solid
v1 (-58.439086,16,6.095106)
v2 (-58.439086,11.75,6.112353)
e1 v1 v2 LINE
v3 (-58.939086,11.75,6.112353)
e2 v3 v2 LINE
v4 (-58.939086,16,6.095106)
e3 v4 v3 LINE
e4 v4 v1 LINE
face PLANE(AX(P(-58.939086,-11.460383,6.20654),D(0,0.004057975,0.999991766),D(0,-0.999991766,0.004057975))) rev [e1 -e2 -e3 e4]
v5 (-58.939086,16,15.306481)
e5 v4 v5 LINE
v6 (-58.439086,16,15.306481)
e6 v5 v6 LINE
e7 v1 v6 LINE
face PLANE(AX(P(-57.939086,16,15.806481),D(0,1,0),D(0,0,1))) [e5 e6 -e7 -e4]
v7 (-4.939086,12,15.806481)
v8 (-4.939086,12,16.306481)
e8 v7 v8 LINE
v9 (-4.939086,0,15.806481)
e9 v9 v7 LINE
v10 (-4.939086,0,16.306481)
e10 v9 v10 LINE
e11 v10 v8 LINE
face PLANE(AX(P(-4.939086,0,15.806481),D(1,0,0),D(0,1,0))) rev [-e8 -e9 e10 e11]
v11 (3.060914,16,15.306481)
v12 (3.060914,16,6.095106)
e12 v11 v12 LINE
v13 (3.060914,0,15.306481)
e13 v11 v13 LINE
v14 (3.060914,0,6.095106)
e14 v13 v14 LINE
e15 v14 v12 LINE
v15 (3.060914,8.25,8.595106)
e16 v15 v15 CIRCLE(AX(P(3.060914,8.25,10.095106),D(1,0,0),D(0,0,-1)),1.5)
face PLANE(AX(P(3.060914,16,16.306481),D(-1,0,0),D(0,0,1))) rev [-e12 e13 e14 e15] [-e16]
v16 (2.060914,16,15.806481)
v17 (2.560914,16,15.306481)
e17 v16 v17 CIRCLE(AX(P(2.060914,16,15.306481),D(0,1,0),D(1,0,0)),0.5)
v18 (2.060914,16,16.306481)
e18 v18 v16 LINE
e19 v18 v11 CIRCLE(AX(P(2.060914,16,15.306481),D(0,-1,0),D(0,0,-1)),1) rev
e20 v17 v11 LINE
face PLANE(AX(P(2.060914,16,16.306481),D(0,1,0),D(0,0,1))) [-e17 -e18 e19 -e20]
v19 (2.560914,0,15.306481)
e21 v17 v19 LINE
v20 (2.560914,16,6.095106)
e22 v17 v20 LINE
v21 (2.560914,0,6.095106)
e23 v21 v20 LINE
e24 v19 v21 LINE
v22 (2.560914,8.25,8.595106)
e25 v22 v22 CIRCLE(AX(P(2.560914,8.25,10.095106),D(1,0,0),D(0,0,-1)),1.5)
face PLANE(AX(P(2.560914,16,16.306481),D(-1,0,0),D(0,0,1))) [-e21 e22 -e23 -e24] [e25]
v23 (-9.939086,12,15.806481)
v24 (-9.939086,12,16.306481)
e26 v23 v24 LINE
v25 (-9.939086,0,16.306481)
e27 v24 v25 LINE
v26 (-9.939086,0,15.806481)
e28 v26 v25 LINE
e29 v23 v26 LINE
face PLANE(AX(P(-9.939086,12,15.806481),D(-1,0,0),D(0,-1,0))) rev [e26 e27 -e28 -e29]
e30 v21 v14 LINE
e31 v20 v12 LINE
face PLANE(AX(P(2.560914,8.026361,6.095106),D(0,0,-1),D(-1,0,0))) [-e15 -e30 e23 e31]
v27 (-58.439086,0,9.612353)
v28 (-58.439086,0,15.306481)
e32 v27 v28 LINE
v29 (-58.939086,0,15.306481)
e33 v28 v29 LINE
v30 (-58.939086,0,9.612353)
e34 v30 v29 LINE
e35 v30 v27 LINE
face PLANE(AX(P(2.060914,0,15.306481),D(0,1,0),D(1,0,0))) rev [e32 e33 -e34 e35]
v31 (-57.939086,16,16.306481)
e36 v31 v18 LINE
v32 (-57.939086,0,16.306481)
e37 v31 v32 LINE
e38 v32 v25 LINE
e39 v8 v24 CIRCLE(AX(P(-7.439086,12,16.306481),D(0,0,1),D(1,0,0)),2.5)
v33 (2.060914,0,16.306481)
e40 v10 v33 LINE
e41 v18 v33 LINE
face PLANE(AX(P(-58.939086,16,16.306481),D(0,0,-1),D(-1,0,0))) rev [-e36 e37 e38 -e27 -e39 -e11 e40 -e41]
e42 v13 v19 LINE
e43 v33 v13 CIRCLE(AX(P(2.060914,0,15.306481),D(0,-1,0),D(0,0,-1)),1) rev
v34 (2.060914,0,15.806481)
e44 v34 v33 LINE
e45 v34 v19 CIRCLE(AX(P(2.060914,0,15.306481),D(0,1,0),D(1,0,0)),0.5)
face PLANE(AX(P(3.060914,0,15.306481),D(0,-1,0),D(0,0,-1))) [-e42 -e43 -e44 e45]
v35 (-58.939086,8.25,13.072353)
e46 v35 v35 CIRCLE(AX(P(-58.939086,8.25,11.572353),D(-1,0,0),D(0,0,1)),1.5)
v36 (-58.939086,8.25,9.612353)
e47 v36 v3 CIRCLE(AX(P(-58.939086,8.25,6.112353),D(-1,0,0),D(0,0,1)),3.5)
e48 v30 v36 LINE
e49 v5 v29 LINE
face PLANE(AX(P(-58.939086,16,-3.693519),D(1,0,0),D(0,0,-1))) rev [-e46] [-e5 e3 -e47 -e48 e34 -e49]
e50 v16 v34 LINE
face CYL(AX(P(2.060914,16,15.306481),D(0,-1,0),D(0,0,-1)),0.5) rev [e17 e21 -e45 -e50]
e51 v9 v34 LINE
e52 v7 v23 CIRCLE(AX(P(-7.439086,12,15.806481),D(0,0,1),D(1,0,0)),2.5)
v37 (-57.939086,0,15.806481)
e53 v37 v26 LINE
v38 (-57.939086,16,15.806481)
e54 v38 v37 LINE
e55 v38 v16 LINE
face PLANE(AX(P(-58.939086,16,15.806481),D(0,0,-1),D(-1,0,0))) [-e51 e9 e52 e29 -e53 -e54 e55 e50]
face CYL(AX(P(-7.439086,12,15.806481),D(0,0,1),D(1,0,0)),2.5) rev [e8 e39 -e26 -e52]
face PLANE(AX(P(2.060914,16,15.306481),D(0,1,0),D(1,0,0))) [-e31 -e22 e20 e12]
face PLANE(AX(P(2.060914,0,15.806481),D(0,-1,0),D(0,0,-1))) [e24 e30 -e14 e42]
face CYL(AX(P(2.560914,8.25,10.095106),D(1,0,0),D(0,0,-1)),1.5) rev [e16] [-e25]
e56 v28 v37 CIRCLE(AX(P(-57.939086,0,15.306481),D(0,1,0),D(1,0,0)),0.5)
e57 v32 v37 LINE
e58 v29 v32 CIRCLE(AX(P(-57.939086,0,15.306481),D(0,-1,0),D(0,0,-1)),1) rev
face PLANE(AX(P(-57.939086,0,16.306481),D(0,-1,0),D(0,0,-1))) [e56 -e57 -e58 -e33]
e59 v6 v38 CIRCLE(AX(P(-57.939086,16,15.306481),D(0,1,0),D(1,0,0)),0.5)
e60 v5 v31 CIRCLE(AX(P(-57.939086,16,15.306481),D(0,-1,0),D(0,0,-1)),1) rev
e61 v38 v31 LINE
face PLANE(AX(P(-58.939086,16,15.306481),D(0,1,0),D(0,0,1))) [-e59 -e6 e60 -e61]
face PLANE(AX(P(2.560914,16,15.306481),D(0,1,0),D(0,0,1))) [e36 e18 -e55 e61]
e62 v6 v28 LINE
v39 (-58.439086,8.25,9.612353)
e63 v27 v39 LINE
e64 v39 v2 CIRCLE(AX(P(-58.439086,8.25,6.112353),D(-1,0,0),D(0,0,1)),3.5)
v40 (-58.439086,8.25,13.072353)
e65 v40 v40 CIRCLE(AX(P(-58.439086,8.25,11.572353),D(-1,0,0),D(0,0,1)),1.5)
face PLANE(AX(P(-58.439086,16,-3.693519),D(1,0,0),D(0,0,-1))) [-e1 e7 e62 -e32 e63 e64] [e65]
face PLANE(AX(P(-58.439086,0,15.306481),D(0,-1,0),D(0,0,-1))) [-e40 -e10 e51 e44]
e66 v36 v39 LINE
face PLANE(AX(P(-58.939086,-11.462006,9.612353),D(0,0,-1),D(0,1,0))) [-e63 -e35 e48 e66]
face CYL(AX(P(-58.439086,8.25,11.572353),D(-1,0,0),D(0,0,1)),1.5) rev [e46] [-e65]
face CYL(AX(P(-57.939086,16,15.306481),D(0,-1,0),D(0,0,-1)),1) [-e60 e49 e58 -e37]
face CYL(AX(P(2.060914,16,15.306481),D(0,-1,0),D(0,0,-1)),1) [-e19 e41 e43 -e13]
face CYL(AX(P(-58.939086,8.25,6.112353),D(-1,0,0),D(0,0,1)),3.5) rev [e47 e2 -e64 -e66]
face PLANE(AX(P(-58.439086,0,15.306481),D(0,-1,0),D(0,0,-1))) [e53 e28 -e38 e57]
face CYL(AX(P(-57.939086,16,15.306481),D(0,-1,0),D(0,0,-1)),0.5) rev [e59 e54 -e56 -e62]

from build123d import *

# Parameters (mm, degrees)
BRIDA_BASE1_DEPTH      = 16
CROQUIS6_R             = 1.5
CROQUIS6_W             = 9.788625446
CROQUIS6_H             = 16
CORTAR_EXTRUIR8_DEPTH  = 0.5
CROQUIS10_R            = 1.5
CORTAR_EXTRUIR10_DEPTH = 0.5
CORTAR_EXTRUIR11_DEPTH = 0.5


# Sheet-metal steps are written as plain solids
with BuildPart() as part:
    # Croquis1 → Brida base1 (new body)
    with BuildSketch(Plane(origin=(0, 0, 0), x_dir=(1, 0, 0), z_dir=(0, 1, 0))):
        with BuildLine():
            Line((-58.939086294, 3.693519459), (-58.939086294, -15.306480541))
            ThreePointArc((-58.939086294, -15.306480541), (-58.646193076, -16.013587323), (-57.939086294, -16.306480541))
            Line((-57.939086294, -16.306480541), (2.060913706, -16.306480541))
            ThreePointArc((2.060913706, -16.306480541), (2.768020487, -16.013587323), (3.060913706, -15.306480541))
            Line((3.060913706, -15.306480541), (3.060913706, 3.693519459))
            Line((3.060913706, 3.693519459), (2.560913706, 3.693519459))
            Line((2.560913706, 3.693519459), (2.560913706, -15.306480541))
            ThreePointArc((2.560913706, -15.306480541), (2.414467096, -15.660033932), (2.060913706, -15.806480541))
            Line((2.060913706, -15.806480541), (-57.939086294, -15.806480541))
            ThreePointArc((-57.939086294, -15.806480541), (-58.292639685, -15.660033932), (-58.439086294, -15.306480541))
            Line((-58.439086294, -15.306480541), (-58.439086294, 3.693519459))
            Line((-58.439086294, 3.693519459), (-58.939086294, 3.693519459))
        make_face()
    extrude(amount=BRIDA_BASE1_DEPTH)

    # Croquis6 → Cortar-Extruir8 (cut)
    with BuildSketch(Plane(origin=(3.060913706, 0, 0), x_dir=(0, 0, -1), z_dir=(1, 0, 0))):
        with Locations((-10.095105987, 8.25)):
            Circle(CROQUIS6_R)
        with Locations((-1.200793264, 8)):
            Rectangle(CROQUIS6_W, CROQUIS6_H)
    extrude(amount=-CORTAR_EXTRUIR8_DEPTH, mode=Mode.SUBTRACT)

    # Croquis10 → Cortar-Extruir10 (cut)
    with BuildSketch(Plane.ZY.offset(58.939086294)):
        with BuildLine():
            Line((6.112352523, 11.75), (6.095105987, 16))
            Line((6.095105987, 16), (-3.693519459, 16))
            Line((-3.693519459, 16), (-3.693519459, 0))
            Line((-3.693519459, 0), (6.095105987, 0))
            Line((6.095105987, 0), (9.612352523, 0))
            Line((9.612352523, 0), (9.612352523, 8.25))
            ThreePointArc((9.612352523, 8.25), (8.587226257, 10.724873734), (6.112352523, 11.75))
        make_face()
        with Locations((11.572352523, 8.25)):
            Circle(CROQUIS10_R)
    extrude(amount=-CORTAR_EXTRUIR10_DEPTH, mode=Mode.SUBTRACT)

    # Croquis11 → Cortar-Extruir11 (cut)
    with BuildSketch(Plane.XY.offset(16.306480541)):
        with BuildLine():
            Line((-9.939086294, 12), (-9.939086294, 0))
            Line((-9.939086294, 0), (-4.939086294, 0))
            Line((-4.939086294, 0), (-4.939086294, 12))
            ThreePointArc((-4.939086294, 12), (-7.439086294, 14.5), (-9.939086294, 12))
        make_face()
    extrude(amount=-CORTAR_EXTRUIR11_DEPTH, mode=Mode.SUBTRACT)


solid = part.part
